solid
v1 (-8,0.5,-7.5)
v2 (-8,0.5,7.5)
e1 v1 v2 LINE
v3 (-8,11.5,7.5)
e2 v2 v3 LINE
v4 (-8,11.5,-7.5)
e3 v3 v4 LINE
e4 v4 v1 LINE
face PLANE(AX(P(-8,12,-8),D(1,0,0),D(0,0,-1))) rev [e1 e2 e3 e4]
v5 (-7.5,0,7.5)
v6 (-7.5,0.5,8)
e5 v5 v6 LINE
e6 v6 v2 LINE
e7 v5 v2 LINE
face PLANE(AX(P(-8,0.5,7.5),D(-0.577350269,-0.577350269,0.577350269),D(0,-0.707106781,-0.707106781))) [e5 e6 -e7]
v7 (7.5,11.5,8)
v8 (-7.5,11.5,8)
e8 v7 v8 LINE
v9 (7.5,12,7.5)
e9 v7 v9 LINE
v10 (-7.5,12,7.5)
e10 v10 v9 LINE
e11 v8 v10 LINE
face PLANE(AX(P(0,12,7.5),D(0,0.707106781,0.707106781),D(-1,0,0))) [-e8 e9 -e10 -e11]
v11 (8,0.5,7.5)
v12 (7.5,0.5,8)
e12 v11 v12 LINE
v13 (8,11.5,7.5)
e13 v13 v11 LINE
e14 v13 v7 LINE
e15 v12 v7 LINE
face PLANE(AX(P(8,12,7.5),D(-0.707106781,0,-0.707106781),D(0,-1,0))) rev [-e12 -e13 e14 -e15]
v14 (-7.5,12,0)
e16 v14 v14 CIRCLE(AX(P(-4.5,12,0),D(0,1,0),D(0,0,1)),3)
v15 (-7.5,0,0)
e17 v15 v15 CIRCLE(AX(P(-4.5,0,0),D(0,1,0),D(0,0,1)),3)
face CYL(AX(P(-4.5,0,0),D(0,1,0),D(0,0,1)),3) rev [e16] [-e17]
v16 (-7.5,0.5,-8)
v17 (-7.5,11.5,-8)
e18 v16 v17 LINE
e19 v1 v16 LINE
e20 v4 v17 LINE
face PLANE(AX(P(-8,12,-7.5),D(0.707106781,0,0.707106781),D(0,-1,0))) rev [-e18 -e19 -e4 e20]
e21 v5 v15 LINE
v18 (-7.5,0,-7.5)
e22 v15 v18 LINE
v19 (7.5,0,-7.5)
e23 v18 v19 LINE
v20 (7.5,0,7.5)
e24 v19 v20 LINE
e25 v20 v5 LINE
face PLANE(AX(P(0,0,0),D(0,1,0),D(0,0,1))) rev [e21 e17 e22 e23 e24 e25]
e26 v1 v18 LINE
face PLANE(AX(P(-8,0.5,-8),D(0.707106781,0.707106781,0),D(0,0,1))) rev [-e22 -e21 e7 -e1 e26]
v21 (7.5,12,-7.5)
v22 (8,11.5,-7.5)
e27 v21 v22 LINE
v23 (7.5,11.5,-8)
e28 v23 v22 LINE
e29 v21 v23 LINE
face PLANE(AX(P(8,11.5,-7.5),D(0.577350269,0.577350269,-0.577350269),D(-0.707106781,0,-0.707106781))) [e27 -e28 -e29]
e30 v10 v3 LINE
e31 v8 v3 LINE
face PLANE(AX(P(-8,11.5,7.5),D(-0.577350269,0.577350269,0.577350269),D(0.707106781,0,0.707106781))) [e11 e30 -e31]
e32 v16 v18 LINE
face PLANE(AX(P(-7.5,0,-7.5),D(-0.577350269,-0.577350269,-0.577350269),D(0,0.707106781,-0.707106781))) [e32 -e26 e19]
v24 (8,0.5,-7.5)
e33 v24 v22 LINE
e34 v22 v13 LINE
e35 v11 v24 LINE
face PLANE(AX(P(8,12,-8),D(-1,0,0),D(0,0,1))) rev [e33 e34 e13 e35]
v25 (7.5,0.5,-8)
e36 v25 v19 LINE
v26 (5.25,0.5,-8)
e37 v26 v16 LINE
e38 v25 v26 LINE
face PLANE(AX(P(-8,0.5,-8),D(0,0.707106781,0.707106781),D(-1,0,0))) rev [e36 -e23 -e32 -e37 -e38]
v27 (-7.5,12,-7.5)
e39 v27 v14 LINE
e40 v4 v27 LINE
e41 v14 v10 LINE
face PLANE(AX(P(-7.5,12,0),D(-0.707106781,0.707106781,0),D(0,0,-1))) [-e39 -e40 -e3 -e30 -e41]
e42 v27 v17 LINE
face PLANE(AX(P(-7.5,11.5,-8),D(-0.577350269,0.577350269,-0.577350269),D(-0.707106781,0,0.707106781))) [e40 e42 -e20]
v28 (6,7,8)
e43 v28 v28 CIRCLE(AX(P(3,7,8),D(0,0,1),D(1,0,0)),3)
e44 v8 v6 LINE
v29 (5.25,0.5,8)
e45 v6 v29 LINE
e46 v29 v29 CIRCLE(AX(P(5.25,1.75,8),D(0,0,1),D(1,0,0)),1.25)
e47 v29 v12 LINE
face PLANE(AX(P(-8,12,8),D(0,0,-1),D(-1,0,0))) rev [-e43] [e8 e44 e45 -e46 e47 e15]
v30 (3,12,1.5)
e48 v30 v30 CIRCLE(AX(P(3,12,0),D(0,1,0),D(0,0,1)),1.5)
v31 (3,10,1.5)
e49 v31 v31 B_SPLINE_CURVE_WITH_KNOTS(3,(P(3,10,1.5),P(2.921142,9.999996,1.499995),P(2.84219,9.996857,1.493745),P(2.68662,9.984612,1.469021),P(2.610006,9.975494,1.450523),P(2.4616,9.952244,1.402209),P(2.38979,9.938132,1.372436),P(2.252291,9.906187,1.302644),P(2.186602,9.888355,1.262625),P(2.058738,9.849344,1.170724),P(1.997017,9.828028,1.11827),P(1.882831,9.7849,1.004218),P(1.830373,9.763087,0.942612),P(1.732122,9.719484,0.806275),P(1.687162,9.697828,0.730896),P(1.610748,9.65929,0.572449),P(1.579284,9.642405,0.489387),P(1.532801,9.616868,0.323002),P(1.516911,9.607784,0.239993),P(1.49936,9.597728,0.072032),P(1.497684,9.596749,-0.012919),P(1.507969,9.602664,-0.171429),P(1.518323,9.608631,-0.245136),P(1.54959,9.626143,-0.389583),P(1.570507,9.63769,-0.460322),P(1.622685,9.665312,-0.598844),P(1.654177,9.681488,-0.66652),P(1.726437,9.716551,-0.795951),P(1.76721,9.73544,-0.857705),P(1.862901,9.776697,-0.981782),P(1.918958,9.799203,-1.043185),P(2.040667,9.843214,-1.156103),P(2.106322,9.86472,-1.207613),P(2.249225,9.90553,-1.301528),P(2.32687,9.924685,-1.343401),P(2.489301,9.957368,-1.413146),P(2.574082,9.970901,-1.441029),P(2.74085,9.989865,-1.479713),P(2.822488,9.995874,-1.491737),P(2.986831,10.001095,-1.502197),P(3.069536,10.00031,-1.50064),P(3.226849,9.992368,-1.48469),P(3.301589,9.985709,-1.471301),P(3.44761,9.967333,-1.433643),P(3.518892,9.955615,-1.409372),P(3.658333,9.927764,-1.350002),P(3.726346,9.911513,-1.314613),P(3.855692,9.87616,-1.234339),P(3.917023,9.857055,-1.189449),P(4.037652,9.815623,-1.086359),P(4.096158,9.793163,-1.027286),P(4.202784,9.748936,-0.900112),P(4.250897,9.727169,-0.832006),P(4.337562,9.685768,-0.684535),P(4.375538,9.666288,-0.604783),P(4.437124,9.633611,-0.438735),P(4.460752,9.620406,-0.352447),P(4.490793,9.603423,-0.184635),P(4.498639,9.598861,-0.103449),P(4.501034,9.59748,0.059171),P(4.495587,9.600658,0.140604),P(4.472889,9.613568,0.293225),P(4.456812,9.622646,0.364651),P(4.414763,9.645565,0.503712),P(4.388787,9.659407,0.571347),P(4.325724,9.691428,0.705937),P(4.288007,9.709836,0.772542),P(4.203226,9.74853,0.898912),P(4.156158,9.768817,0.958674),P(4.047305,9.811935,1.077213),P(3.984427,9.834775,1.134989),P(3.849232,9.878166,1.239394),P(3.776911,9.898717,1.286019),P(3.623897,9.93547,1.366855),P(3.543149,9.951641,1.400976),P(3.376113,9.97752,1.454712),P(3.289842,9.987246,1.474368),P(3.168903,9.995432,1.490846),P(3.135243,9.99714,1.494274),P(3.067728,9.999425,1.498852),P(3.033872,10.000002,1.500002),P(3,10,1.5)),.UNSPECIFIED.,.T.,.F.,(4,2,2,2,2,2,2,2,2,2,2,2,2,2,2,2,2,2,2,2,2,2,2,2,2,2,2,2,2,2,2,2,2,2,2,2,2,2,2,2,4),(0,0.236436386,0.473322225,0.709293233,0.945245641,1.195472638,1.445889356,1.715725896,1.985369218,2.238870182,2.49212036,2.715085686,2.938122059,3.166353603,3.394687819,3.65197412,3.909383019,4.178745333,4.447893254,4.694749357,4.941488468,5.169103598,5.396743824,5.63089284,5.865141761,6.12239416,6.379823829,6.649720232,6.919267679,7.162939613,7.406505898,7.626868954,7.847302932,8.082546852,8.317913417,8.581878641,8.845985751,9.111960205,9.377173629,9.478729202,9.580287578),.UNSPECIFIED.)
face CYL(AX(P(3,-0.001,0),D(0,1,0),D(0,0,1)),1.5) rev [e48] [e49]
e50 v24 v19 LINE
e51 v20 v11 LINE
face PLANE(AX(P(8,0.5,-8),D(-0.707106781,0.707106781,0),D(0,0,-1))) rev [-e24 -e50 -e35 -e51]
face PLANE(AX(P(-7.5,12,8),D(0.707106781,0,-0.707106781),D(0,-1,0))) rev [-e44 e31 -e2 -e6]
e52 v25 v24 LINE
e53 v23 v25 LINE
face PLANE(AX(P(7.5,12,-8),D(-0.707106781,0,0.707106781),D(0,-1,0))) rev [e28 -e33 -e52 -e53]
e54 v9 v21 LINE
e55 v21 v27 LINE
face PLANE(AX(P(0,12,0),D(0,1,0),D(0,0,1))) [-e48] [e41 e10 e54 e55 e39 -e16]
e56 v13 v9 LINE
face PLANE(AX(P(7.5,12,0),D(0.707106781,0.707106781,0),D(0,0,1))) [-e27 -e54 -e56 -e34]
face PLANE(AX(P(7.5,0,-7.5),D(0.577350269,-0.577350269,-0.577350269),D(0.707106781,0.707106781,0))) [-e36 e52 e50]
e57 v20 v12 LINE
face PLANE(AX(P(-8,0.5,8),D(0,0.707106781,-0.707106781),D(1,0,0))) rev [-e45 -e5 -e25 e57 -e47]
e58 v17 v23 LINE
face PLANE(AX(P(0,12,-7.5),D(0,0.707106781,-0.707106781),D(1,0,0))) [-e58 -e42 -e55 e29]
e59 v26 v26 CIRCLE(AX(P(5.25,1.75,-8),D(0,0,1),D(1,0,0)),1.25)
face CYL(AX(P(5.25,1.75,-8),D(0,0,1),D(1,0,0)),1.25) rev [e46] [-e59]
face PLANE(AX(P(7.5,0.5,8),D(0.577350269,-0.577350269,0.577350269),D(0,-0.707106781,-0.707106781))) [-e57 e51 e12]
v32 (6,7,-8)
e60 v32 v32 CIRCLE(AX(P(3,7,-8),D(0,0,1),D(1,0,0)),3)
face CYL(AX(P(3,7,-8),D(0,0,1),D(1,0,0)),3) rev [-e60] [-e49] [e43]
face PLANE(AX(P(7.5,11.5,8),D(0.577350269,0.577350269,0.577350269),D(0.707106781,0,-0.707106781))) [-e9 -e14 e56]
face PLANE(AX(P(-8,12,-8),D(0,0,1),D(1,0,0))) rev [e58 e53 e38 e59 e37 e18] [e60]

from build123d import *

# Parameters (mm, degrees)
SKETCH_1_W               = 16
SKETCH_1_H               = 16
EXTRUDE_1_DEPTH          = 12
SKETCH_2_R               = 3
CUT_EXTRUDE_2_DEPTH      = 17.492422502
SKETCH_3_R               = 1.25
CUT_EXTRUDE_3_DEPTH      = 22.540659229
SKETCH_4_R               = 3
CUT_EXTRUDE_4_DEPTH      = 22.540659229
CHAMFER_1_SIZE           = 0.5
CUT_EXTRUDE_5_REACH      = 18.492
CUT_EXTRUDE_5_END_RADIUS = 3
SKETCH_5_R               = 1.5


with BuildPart() as part:
    # 草圖1 → 填料-伸長1 (new body)
    with BuildSketch(Plane(origin=(0, 0, 0), x_dir=(1, 0, 0), z_dir=(0, 1, 0))):
        Rectangle(SKETCH_1_W, SKETCH_1_H)
    extrude(amount=EXTRUDE_1_DEPTH)

    # 草圖2 → 除料-伸長2 (cut, through all)
    with BuildSketch(Plane(origin=(0, 12, 0), x_dir=(1, 0, 0), z_dir=(0, 1, 0))):
        with Locations(Location((-4.5, 0, 0), (0, 0, 270))):
            Circle(SKETCH_2_R)
    extrude(amount=-CUT_EXTRUDE_2_DEPTH, mode=Mode.SUBTRACT)

    # 草圖3 → 除料-伸長3 (cut, through all)
    with BuildSketch(Plane.XY.offset(8)):
        with Locations((5.25, 1.75)):
            Circle(SKETCH_3_R)
    extrude(amount=-CUT_EXTRUDE_3_DEPTH, mode=Mode.SUBTRACT)

    # 草圖4 → 除料-伸長4 (cut, through all)
    with BuildSketch(Plane.XY.offset(8)):
        with Locations((3, 7)):
            Circle(SKETCH_4_R)
    extrude(amount=-CUT_EXTRUDE_4_DEPTH, mode=Mode.SUBTRACT)

    # 導角1
    chamfer_1_edges = [part.edges().sort_by_distance(p)[0] for p in [
        (8, 12, 0),
        (0, 12, -8),
        (-8, 12, 0),
        (0, 0, -8),
        (8, 0, 0),
        (0, 0, 8),
        (-8, 0, 0),
        (0, 12, 8),
        (-8, 6, -8),
        (8, 6, -8),
        (8, 6, 8),
        (-8, 6, 8),
    ]]
    chamfer(chamfer_1_edges, length=CHAMFER_1_SIZE - 0.0001)  # a hair under: the kernel refuses the full size

    # 除料-伸長5: up to this cylinder (the profile starts outside it)
    cut_extrude_5_end = Plane(origin=(3, 7, 0), z_dir=(0, 0, 1)) * Cylinder(CUT_EXTRUDE_5_END_RADIUS, 43.984, mode=Mode.PRIVATE)
    # 草圖5 → 除料-伸長5 (cut, up to the surface)
    with BuildSketch(Plane(origin=(0, 12, 0), x_dir=(1, 0, 0), z_dir=(0, 1, 0)), mode=Mode.PRIVATE) as cut_extrude_5_sk1:
        with Locations(Location((3, 0, 0), (0, 0, 270))):
            Circle(SKETCH_5_R)
    cut_extrude_5_tool1 = extrude(cut_extrude_5_sk1.sketch, amount=-CUT_EXTRUDE_5_REACH, mode=Mode.PRIVATE) - cut_extrude_5_end
    add(cut_extrude_5_tool1.solids().sort_by_distance((3, 12, 0))[0], mode=Mode.SUBTRACT)


solid = part.part
